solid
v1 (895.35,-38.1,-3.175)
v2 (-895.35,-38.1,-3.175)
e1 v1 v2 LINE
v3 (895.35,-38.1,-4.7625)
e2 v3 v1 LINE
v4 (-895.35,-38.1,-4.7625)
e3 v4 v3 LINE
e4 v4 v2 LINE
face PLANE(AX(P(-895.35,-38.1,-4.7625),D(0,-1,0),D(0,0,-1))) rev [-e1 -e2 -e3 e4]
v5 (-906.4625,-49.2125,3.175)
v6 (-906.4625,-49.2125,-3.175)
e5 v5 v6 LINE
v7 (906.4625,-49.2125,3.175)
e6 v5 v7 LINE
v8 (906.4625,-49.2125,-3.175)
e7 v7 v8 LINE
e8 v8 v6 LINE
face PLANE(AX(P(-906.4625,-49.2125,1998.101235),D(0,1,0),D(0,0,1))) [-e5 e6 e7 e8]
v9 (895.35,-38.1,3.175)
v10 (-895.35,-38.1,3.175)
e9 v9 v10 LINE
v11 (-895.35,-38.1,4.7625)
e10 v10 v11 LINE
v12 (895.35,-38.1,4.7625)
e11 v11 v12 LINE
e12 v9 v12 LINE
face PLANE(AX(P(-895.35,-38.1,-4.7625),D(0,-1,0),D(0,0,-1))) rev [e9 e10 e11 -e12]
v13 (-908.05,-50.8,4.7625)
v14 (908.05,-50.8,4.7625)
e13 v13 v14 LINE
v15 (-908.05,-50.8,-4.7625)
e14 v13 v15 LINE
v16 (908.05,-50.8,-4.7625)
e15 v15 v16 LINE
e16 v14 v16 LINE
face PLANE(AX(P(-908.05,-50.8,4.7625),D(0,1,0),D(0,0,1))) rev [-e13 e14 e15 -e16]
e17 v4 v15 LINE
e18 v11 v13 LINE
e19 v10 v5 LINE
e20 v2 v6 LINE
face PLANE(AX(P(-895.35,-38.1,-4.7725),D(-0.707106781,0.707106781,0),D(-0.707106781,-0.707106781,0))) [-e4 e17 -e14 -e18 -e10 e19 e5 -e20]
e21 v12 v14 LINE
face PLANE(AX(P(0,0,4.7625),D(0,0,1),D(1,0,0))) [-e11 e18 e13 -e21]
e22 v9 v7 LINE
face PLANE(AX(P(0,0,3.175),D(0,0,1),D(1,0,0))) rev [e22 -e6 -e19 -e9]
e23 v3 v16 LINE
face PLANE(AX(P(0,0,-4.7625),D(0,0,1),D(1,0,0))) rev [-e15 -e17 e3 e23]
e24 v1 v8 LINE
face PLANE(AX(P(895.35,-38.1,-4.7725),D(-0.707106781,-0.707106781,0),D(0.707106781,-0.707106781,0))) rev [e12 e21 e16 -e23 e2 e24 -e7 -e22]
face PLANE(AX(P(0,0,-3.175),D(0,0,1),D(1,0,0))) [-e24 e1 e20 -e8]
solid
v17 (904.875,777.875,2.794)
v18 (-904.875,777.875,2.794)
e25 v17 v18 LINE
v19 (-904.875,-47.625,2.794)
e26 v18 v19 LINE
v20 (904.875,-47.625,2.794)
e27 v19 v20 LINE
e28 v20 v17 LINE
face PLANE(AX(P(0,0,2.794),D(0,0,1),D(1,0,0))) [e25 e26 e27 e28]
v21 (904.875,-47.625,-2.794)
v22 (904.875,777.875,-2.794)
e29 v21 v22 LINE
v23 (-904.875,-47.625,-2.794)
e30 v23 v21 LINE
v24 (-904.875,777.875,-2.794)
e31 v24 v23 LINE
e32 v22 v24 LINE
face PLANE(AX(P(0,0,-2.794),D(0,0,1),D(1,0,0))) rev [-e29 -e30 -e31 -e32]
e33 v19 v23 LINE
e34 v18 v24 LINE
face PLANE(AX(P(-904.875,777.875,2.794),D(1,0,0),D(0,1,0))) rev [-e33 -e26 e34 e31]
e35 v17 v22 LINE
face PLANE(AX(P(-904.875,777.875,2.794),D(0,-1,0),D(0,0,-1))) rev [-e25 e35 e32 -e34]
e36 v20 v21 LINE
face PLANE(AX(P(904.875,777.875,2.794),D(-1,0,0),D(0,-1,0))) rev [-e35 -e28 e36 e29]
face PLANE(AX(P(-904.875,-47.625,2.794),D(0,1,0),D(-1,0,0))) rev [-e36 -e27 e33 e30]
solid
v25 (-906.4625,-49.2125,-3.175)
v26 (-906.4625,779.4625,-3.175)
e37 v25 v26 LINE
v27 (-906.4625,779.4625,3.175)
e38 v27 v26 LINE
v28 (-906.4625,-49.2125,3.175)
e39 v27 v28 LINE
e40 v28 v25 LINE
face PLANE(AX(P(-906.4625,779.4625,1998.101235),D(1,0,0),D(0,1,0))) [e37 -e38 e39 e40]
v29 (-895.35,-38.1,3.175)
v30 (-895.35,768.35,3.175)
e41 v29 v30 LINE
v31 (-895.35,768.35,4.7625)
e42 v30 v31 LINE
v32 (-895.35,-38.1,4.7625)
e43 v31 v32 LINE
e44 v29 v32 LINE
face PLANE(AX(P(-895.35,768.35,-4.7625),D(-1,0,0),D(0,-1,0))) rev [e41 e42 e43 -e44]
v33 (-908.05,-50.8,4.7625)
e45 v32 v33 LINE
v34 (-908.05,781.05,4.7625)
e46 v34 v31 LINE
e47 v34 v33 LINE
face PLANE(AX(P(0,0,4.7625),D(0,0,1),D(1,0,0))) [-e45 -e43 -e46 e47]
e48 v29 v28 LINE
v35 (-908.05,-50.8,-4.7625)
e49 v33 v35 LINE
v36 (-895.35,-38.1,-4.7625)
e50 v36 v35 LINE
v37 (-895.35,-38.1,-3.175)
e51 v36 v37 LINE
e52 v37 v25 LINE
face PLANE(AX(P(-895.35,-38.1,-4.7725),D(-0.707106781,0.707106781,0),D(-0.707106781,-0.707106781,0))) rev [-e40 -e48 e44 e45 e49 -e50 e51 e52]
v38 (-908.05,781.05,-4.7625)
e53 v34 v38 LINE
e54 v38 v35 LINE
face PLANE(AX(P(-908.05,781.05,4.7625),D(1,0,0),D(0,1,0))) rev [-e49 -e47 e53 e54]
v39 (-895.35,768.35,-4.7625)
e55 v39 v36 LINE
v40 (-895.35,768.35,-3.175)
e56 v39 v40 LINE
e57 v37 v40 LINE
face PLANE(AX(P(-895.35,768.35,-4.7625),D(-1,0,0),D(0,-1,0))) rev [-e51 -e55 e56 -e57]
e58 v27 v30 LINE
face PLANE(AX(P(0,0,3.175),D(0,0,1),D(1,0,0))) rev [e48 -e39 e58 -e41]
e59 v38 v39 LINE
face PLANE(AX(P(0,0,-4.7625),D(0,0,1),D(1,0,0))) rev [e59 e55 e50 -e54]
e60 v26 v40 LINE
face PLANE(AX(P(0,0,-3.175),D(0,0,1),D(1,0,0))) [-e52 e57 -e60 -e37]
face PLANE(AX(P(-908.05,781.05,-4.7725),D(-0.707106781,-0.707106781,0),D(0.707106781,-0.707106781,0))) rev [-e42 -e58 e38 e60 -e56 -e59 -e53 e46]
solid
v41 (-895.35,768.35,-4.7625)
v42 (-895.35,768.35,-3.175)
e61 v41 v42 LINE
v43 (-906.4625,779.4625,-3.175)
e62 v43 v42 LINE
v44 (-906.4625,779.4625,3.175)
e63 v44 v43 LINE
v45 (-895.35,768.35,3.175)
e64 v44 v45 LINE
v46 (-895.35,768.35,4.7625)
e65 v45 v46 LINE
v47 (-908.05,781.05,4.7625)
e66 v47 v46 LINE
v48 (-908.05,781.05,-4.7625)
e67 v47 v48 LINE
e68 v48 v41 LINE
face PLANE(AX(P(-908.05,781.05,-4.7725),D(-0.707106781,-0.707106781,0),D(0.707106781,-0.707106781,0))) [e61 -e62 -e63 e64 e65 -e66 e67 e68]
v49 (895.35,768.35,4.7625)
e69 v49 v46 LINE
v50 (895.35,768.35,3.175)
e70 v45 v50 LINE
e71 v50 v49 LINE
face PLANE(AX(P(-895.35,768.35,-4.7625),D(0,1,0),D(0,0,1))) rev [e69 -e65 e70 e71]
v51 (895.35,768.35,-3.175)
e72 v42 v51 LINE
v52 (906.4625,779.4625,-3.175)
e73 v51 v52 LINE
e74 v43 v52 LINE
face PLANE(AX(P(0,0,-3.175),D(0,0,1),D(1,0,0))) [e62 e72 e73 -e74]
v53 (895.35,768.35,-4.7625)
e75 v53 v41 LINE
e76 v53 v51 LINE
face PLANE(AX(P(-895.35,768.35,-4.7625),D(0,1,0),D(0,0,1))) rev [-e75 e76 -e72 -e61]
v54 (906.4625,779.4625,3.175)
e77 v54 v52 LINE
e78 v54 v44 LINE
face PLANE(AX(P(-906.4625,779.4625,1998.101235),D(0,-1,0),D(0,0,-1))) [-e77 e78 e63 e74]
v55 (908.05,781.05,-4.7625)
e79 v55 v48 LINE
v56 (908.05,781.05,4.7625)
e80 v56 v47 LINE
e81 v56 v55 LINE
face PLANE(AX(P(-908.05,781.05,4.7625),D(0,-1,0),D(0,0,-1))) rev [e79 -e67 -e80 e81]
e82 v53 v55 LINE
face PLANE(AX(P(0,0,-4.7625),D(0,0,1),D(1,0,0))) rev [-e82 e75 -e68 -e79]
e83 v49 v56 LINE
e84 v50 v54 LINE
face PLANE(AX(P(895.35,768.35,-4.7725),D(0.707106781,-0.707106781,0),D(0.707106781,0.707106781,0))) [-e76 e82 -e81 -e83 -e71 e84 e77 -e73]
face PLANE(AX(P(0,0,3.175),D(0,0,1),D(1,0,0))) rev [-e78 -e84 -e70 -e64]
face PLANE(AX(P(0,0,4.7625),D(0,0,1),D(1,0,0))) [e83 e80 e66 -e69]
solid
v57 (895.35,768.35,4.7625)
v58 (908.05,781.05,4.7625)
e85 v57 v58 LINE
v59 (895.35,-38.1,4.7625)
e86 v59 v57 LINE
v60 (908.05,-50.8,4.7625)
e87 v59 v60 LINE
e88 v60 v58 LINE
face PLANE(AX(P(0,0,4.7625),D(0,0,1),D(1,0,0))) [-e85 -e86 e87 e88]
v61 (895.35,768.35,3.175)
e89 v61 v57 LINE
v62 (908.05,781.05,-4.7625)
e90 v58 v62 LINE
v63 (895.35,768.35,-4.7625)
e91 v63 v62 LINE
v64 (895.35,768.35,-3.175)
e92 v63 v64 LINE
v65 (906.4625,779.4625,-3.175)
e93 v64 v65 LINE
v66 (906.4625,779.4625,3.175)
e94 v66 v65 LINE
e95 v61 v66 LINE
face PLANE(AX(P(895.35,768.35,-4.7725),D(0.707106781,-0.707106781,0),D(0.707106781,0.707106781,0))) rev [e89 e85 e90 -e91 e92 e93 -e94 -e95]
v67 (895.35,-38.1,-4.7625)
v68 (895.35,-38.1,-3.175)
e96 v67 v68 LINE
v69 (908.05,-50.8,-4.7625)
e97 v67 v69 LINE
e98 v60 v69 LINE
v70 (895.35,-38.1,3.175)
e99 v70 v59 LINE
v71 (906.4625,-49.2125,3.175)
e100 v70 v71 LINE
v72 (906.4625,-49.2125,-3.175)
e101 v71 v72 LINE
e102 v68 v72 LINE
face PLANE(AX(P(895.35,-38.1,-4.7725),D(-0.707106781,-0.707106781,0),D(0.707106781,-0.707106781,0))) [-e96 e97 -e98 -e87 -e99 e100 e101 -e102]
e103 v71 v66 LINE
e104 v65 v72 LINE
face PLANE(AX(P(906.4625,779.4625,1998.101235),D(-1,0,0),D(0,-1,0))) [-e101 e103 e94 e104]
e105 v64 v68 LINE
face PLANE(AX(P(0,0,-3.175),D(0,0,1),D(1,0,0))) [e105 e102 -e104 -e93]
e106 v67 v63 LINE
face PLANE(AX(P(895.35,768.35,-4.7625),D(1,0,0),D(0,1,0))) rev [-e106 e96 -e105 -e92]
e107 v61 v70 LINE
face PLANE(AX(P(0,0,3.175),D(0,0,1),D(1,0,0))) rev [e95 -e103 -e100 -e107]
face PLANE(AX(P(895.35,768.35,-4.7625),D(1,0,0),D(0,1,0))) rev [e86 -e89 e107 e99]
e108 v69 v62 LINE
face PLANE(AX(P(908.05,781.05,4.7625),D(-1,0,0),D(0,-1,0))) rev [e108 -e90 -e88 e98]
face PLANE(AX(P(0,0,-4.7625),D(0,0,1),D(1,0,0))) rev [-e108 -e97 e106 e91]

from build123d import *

# Parameters (mm, degrees)
SKETCH2_W                     = 1816.1
SKETCH2_H                     = 831.85
FRAME_OUTER_DIMENSIONS_DEPTH  = 4.7625
SKETCH3_W                     = 1790.7
SKETCH3_H                     = 806.45
FRAME_INNER_DIMENSIONS_DEPTH  = 1198.783215204
CUT_EXTRUDE2_DEPTH            = 3.175
CUT_EXTRUDE2_DEPTH_BACK       = 3.175
SKETCH4_W                     = 1812.925
SKETCH4_H                     = 828.675
FRAME_START                   = -4.7625
FRAME_SECTIONS_SPLIT_DEPTH    = 9.525
FRAME_SECTIONS_SPLIT_2_DEPTH  = 1.5875
FRAME_START_2                 = 3.175
FRAME_SECTIONS_SPLIT_3_DEPTH  = 1.5875
FRAME_START_3                 = -3.175
FRAME_SECTIONS_SPLIT_4_DEPTH  = 6.35
FRAME_SECTIONS_SPLIT_5_DEPTH  = 1.5875
FRAME_SECTIONS_SPLIT_6_DEPTH  = 1.5875
FRAME_SECTIONS_SPLIT_7_DEPTH  = 6.35
FRAME_SECTIONS_SPLIT_8_DEPTH  = 1.5875
FRAME_SECTIONS_SPLIT_9_DEPTH  = 1.5875
FRAME_SECTIONS_SPLIT_10_DEPTH = 6.35
SKETCH6_W                     = 1809.75
SKETCH6_H                     = 825.5
DOOR_PANEL_DEPTH              = 2.794


# Read off the part's stored shape, not the designer's step: Frame sections split
with BuildPart() as part:
    # Sketch2 → Frame outer dimensions (new, symmetric)
    with BuildSketch(Plane.XY):
        with Locations((0, 365.125)):
            Rectangle(SKETCH2_W, SKETCH2_H)
    extrude(amount=FRAME_OUTER_DIMENSIONS_DEPTH, both=True)

    # Sketch3 → Frame inner dimensions (cut, through all)
    with BuildSketch(Plane.XY.offset(4.7625)):
        with Locations((0, 365.125)):
            Rectangle(SKETCH3_W, SKETCH3_H)
    extrude(amount=-FRAME_INNER_DIMENSIONS_DEPTH, mode=Mode.SUBTRACT)

    # Sketch4 → Cut-Extrude2 (cut, two sides: drawn at the far end of the back side and taken through both)
    with BuildSketch(Plane.XY.offset(-CUT_EXTRUDE2_DEPTH_BACK)):
        with Locations((0, 365.125)):
            Rectangle(SKETCH4_W, SKETCH4_H)
    extrude(amount=CUT_EXTRUDE2_DEPTH + CUT_EXTRUDE2_DEPTH_BACK, mode=Mode.SUBTRACT)

    # Frame sections split outline → Frame sections split (cut)
    with BuildSketch(Plane.XY.offset(FRAME_START)):
        Polygon((895.35, 768.35), (895.35, -38.1), (-895.35, -38.1), (-895.35, 768.35), (-908.05, 781.05), (-908.05, -50.8), (908.05, -50.8), (908.05, 781.05), align=None)
    extrude(amount=FRAME_SECTIONS_SPLIT_DEPTH, mode=Mode.SUBTRACT)


with BuildPart() as body_2:
    # Frame sections split 2 outline → Frame sections split 2 (new body)
    with BuildSketch(Plane.XY.offset(FRAME_START)):
        Polygon((895.35, 768.35), (895.35, -38.1), (908.05, -50.8), (908.05, 781.05), align=None)
    extrude(amount=FRAME_SECTIONS_SPLIT_2_DEPTH)

    # Frame sections split 3 outline → Frame sections split 3 (add)
    with BuildSketch(Plane.XY.offset(FRAME_START_2)):
        Polygon((895.35, 768.35), (895.35, -38.1), (908.05, -50.8), (908.05, 781.05), align=None)
    extrude(amount=FRAME_SECTIONS_SPLIT_3_DEPTH)

    # Frame sections split 4 outline → Frame sections split 4 (add)
    with BuildSketch(Plane.XY.offset(FRAME_START_3)):
        Polygon((908.05, 781.05), (906.4625, 779.4625), (906.4625, -49.2125), (908.05, -50.8), align=None)
    extrude(amount=FRAME_SECTIONS_SPLIT_4_DEPTH)


with BuildPart() as body_3:
    # Frame sections split 5 outline → Frame sections split 5 (new body)
    with BuildSketch(Plane.XY.offset(FRAME_START)):
        Polygon((-895.35, -38.1), (-895.35, 768.35), (-908.05, 781.05), (-908.05, -50.8), align=None)
    extrude(amount=FRAME_SECTIONS_SPLIT_5_DEPTH)

    # Frame sections split 6 outline → Frame sections split 6 (add)
    with BuildSketch(Plane.XY.offset(FRAME_START_2)):
        Polygon((-895.35, -38.1), (-895.35, 768.35), (-908.05, 781.05), (-908.05, -50.8), align=None)
    extrude(amount=FRAME_SECTIONS_SPLIT_6_DEPTH)

    # Frame sections split 7 outline → Frame sections split 7 (add)
    with BuildSketch(Plane.XY.offset(FRAME_START_3)):
        Polygon((-908.05, -50.8), (-906.4625, -49.2125), (-906.4625, 779.4625), (-908.05, 781.05), align=None)
    extrude(amount=FRAME_SECTIONS_SPLIT_7_DEPTH)


with BuildPart() as body_4:
    # Frame sections split 8 outline → Frame sections split 8 (new body)
    with BuildSketch(Plane.XY.offset(FRAME_START)):
        Polygon((895.35, -38.1), (-895.35, -38.1), (-908.05, -50.8), (908.05, -50.8), align=None)
    extrude(amount=FRAME_SECTIONS_SPLIT_8_DEPTH)

    # Frame sections split 9 outline → Frame sections split 9 (add)
    with BuildSketch(Plane.XY.offset(FRAME_START_2)):
        Polygon((895.35, -38.1), (-895.35, -38.1), (-908.05, -50.8), (908.05, -50.8), align=None)
    extrude(amount=FRAME_SECTIONS_SPLIT_9_DEPTH)

    # Frame sections split 10 outline → Frame sections split 10 (add)
    with BuildSketch(Plane.XY.offset(FRAME_START_3)):
        Polygon((908.05, -50.8), (906.4625, -49.2125), (-906.4625, -49.2125), (-908.05, -50.8), align=None)
    extrude(amount=FRAME_SECTIONS_SPLIT_10_DEPTH)


with BuildPart() as body_5:
    # Sketch6 → Door panel (new, symmetric)
    with BuildSketch(Plane.XY):
        with Locations((0, 365.125)):
            Rectangle(SKETCH6_W, SKETCH6_H)
    extrude(amount=DOOR_PANEL_DEPTH, both=True)


solid = Compound([part.part, body_2.part, body_3.part, body_4.part, body_5.part])
